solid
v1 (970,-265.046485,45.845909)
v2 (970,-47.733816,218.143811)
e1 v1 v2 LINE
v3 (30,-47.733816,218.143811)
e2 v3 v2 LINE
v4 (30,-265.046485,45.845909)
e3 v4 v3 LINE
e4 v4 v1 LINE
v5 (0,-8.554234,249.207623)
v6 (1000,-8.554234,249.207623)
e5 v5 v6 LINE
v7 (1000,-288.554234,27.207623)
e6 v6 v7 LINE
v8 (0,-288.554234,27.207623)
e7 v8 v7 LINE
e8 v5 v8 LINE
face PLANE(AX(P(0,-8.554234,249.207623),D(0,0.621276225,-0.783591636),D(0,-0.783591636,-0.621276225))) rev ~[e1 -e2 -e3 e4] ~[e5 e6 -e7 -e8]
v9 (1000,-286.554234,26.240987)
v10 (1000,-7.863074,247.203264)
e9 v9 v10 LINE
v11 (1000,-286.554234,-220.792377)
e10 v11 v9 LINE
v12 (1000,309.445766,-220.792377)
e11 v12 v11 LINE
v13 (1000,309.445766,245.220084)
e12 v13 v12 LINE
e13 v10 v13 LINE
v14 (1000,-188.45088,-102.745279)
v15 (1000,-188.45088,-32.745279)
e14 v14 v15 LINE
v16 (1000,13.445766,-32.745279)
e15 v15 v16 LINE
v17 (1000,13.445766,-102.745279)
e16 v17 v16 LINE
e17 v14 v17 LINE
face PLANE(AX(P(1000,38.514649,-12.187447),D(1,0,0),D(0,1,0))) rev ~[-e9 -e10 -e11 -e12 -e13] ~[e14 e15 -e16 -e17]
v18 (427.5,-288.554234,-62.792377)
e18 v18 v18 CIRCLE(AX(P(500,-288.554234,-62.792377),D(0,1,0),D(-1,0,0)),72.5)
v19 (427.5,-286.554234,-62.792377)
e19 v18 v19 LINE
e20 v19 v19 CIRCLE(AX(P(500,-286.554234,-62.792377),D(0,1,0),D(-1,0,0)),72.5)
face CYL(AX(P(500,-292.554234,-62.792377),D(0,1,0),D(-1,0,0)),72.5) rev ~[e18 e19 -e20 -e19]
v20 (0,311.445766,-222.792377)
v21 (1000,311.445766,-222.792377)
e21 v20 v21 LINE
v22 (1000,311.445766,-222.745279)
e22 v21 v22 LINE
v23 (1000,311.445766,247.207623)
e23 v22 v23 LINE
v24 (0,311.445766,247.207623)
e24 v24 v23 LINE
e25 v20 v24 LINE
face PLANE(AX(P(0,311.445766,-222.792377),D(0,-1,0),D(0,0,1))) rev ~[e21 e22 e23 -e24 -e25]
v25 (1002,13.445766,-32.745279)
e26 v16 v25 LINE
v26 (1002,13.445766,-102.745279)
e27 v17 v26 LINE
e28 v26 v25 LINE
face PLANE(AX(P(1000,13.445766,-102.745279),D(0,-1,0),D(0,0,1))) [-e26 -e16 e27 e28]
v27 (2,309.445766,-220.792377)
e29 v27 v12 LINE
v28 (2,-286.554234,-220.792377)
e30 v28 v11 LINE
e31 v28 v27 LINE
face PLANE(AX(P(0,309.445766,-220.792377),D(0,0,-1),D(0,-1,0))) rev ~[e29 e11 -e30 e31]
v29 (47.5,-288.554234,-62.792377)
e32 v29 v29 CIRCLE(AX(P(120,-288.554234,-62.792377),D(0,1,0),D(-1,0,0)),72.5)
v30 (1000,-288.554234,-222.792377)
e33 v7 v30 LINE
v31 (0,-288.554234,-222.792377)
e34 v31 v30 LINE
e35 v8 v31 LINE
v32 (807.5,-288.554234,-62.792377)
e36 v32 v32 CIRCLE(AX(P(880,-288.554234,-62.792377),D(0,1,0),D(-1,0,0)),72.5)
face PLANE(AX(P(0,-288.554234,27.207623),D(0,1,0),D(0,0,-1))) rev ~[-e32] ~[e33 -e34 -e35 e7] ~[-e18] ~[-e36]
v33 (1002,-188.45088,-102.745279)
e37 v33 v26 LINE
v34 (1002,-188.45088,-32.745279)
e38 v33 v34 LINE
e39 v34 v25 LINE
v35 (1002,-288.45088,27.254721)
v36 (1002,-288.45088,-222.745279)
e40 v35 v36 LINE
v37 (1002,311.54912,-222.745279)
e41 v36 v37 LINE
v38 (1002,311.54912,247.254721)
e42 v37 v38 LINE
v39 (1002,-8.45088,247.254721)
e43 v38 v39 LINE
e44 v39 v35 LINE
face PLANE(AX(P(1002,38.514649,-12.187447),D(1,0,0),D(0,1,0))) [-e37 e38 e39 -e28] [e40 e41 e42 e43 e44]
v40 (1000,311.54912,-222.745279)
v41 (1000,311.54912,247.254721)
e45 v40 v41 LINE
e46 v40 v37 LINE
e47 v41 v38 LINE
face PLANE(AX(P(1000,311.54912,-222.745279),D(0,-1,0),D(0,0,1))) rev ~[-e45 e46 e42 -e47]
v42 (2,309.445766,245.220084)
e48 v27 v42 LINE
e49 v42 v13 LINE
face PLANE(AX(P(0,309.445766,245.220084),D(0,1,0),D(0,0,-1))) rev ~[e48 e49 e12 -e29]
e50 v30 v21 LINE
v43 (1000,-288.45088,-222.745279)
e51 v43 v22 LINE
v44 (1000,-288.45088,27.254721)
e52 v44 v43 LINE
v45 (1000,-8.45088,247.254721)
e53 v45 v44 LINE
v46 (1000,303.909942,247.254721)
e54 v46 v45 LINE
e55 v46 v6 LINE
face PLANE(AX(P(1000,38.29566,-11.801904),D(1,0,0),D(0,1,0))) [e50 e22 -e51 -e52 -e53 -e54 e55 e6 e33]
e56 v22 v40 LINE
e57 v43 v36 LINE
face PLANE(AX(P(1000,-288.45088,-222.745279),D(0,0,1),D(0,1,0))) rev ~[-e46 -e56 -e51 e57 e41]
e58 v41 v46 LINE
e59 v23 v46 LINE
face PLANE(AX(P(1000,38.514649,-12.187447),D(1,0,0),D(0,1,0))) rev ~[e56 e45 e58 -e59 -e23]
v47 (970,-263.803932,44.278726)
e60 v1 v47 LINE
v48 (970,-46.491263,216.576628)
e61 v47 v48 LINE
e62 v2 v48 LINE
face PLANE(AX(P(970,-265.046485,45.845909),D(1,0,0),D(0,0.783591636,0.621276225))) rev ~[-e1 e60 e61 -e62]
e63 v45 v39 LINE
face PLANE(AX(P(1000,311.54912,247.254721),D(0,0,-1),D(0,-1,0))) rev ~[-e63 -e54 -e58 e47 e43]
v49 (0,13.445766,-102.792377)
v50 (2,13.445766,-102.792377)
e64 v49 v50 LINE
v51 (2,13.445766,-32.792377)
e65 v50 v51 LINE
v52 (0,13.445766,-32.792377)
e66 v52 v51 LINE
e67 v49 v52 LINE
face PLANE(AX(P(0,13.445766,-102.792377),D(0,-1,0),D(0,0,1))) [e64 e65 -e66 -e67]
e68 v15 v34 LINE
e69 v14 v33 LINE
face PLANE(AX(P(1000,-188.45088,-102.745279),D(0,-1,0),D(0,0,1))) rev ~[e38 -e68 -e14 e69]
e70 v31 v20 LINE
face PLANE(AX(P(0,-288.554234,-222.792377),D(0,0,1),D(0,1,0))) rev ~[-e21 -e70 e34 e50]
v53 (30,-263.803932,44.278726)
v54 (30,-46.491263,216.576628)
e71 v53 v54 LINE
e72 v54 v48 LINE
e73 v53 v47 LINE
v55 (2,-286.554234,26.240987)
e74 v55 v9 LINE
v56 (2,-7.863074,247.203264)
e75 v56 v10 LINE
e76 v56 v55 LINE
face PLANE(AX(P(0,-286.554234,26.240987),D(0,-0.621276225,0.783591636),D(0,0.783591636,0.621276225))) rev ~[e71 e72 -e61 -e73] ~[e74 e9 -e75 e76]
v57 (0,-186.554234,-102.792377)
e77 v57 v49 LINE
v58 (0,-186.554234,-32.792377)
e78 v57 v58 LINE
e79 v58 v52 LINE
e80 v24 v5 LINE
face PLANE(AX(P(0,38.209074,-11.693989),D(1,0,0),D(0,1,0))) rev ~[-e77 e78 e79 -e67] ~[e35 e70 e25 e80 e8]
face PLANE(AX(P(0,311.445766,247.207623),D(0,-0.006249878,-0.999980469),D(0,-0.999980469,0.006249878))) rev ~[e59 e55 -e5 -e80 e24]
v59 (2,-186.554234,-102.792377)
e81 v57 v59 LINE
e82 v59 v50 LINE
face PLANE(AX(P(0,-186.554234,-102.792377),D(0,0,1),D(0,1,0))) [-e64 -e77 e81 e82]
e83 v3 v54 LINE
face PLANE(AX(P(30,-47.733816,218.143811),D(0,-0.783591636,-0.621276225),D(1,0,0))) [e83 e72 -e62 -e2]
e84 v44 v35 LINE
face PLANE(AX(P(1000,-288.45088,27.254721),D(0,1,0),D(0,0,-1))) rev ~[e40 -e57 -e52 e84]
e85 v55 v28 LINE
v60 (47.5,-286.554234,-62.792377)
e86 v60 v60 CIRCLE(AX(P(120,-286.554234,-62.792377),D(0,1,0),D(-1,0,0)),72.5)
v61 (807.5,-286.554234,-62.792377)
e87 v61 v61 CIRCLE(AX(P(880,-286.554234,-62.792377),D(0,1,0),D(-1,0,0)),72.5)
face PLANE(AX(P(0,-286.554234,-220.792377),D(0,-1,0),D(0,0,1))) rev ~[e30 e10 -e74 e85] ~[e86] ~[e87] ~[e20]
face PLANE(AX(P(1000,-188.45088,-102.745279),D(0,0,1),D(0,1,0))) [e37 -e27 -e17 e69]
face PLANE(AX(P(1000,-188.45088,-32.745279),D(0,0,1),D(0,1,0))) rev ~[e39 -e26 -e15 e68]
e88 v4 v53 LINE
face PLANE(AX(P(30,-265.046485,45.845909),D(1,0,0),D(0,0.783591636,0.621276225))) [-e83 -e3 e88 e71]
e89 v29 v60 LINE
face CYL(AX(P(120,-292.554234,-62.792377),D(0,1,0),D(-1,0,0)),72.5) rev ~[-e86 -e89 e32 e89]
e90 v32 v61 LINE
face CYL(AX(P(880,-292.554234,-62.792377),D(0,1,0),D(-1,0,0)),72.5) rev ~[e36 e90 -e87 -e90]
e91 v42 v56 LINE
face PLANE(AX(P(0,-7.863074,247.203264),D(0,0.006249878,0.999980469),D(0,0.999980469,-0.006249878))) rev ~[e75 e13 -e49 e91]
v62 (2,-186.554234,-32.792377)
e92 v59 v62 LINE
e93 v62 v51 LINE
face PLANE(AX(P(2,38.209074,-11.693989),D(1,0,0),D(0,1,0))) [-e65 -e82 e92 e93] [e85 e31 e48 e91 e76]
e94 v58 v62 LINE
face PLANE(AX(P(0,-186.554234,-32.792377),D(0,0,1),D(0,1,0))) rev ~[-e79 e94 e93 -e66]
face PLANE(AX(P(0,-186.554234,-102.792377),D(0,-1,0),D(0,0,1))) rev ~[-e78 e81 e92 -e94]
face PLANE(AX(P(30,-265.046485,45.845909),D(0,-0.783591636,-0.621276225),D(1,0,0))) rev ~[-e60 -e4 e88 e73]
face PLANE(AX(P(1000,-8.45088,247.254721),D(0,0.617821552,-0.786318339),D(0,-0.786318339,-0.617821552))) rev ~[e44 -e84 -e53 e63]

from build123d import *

# Parameters (mm, degrees)
F2_DEPTH = 1000
F3_W     = 940
F3_H     = 277.328980073
F4_DEPTH = 5
F6_D     = 145
F6_DEPTH = 4
F6_TIP   = 43.5623948795
F1_W     = 200
F1_H     = 70
F7_DEPTH = 2
F8_W     = 201.8966459586
F8_H     = 70
F9_DEPTH = 2


with BuildPart() as f2:
    # F1 (on Right) → F2 (new body)
    with BuildSketch(Plane.YZ):
        Polygon((-288.5542339748, 27.2076225815), (-288.5542339748, -222.7923774185), (311.4457660252, -222.7923774185), (311.4457660252, 247.2076225815), (-8.5542339748, 249.2076225815), align=None)
        Polygon((-286.5542339748, 26.2409870095), (-7.8630740966, 247.2032637701), (309.4457660252, 245.2200835194), (309.4457660252, -220.7923774185), (-286.5542339748, -220.7923774185), align=None, mode=Mode.SUBTRACT)
    extrude(amount=F2_DEPTH)

    # F3 (on face) → F4 (cut)
    with BuildSketch(Plane(origin=(0, -124.6227615588, 157.1818614256), x_dir=(1, 0, 0), z_dir=(0, -0.6212762255, 0.7835916358))):
        with Locations((500, -40.5407451073)):
            Rectangle(F3_W, F3_H)
    extrude(amount=-F4_DEPTH, mode=Mode.SUBTRACT)

    # F6
    with Locations(Plane.XZ.offset(288.5542339748)):
        with Locations((120, -62.7923774185), (500, -62.7923774185), (880, -62.7923774185)):
            Hole(F6_D / 2, depth=F6_DEPTH)
            with Locations((0, 0, -(F6_DEPTH + F6_TIP / 2))):  # 118° drill point
                Cone(0, F6_D / 2, F6_TIP, mode=Mode.SUBTRACT)

    # F1 (on Right) → F7 (join)
    with BuildSketch(Plane.YZ):
        Polygon((309.4457660252, 245.2200835194), (-7.8630740966, 247.2032637701), (-286.5542339748, 26.2409870095), (-286.5542339748, -220.7923774185), (309.4457660252, -220.7923774185), align=None)
        with Locations((-86.5542339748, -67.7923774185)):
            Rectangle(F1_W, F1_H, mode=Mode.SUBTRACT)
    extrude(amount=F7_DEPTH)

    # F8 (on face) → F9 (join)
    with BuildSketch(Plane.YZ.offset(1000)):
        Polygon((-288.4508799334, 27.2547214809), (-288.4508799334, -222.7452785191), (311.5491200666, -222.7452785191), (311.5491200666, 247.2547214809), (-8.4508799334, 247.2547214809), align=None)
        with Locations((-87.5025569541, -67.7452785191)):
            Rectangle(F8_W, F8_H, mode=Mode.SUBTRACT)
    extrude(amount=F9_DEPTH)


solid = f2.part
